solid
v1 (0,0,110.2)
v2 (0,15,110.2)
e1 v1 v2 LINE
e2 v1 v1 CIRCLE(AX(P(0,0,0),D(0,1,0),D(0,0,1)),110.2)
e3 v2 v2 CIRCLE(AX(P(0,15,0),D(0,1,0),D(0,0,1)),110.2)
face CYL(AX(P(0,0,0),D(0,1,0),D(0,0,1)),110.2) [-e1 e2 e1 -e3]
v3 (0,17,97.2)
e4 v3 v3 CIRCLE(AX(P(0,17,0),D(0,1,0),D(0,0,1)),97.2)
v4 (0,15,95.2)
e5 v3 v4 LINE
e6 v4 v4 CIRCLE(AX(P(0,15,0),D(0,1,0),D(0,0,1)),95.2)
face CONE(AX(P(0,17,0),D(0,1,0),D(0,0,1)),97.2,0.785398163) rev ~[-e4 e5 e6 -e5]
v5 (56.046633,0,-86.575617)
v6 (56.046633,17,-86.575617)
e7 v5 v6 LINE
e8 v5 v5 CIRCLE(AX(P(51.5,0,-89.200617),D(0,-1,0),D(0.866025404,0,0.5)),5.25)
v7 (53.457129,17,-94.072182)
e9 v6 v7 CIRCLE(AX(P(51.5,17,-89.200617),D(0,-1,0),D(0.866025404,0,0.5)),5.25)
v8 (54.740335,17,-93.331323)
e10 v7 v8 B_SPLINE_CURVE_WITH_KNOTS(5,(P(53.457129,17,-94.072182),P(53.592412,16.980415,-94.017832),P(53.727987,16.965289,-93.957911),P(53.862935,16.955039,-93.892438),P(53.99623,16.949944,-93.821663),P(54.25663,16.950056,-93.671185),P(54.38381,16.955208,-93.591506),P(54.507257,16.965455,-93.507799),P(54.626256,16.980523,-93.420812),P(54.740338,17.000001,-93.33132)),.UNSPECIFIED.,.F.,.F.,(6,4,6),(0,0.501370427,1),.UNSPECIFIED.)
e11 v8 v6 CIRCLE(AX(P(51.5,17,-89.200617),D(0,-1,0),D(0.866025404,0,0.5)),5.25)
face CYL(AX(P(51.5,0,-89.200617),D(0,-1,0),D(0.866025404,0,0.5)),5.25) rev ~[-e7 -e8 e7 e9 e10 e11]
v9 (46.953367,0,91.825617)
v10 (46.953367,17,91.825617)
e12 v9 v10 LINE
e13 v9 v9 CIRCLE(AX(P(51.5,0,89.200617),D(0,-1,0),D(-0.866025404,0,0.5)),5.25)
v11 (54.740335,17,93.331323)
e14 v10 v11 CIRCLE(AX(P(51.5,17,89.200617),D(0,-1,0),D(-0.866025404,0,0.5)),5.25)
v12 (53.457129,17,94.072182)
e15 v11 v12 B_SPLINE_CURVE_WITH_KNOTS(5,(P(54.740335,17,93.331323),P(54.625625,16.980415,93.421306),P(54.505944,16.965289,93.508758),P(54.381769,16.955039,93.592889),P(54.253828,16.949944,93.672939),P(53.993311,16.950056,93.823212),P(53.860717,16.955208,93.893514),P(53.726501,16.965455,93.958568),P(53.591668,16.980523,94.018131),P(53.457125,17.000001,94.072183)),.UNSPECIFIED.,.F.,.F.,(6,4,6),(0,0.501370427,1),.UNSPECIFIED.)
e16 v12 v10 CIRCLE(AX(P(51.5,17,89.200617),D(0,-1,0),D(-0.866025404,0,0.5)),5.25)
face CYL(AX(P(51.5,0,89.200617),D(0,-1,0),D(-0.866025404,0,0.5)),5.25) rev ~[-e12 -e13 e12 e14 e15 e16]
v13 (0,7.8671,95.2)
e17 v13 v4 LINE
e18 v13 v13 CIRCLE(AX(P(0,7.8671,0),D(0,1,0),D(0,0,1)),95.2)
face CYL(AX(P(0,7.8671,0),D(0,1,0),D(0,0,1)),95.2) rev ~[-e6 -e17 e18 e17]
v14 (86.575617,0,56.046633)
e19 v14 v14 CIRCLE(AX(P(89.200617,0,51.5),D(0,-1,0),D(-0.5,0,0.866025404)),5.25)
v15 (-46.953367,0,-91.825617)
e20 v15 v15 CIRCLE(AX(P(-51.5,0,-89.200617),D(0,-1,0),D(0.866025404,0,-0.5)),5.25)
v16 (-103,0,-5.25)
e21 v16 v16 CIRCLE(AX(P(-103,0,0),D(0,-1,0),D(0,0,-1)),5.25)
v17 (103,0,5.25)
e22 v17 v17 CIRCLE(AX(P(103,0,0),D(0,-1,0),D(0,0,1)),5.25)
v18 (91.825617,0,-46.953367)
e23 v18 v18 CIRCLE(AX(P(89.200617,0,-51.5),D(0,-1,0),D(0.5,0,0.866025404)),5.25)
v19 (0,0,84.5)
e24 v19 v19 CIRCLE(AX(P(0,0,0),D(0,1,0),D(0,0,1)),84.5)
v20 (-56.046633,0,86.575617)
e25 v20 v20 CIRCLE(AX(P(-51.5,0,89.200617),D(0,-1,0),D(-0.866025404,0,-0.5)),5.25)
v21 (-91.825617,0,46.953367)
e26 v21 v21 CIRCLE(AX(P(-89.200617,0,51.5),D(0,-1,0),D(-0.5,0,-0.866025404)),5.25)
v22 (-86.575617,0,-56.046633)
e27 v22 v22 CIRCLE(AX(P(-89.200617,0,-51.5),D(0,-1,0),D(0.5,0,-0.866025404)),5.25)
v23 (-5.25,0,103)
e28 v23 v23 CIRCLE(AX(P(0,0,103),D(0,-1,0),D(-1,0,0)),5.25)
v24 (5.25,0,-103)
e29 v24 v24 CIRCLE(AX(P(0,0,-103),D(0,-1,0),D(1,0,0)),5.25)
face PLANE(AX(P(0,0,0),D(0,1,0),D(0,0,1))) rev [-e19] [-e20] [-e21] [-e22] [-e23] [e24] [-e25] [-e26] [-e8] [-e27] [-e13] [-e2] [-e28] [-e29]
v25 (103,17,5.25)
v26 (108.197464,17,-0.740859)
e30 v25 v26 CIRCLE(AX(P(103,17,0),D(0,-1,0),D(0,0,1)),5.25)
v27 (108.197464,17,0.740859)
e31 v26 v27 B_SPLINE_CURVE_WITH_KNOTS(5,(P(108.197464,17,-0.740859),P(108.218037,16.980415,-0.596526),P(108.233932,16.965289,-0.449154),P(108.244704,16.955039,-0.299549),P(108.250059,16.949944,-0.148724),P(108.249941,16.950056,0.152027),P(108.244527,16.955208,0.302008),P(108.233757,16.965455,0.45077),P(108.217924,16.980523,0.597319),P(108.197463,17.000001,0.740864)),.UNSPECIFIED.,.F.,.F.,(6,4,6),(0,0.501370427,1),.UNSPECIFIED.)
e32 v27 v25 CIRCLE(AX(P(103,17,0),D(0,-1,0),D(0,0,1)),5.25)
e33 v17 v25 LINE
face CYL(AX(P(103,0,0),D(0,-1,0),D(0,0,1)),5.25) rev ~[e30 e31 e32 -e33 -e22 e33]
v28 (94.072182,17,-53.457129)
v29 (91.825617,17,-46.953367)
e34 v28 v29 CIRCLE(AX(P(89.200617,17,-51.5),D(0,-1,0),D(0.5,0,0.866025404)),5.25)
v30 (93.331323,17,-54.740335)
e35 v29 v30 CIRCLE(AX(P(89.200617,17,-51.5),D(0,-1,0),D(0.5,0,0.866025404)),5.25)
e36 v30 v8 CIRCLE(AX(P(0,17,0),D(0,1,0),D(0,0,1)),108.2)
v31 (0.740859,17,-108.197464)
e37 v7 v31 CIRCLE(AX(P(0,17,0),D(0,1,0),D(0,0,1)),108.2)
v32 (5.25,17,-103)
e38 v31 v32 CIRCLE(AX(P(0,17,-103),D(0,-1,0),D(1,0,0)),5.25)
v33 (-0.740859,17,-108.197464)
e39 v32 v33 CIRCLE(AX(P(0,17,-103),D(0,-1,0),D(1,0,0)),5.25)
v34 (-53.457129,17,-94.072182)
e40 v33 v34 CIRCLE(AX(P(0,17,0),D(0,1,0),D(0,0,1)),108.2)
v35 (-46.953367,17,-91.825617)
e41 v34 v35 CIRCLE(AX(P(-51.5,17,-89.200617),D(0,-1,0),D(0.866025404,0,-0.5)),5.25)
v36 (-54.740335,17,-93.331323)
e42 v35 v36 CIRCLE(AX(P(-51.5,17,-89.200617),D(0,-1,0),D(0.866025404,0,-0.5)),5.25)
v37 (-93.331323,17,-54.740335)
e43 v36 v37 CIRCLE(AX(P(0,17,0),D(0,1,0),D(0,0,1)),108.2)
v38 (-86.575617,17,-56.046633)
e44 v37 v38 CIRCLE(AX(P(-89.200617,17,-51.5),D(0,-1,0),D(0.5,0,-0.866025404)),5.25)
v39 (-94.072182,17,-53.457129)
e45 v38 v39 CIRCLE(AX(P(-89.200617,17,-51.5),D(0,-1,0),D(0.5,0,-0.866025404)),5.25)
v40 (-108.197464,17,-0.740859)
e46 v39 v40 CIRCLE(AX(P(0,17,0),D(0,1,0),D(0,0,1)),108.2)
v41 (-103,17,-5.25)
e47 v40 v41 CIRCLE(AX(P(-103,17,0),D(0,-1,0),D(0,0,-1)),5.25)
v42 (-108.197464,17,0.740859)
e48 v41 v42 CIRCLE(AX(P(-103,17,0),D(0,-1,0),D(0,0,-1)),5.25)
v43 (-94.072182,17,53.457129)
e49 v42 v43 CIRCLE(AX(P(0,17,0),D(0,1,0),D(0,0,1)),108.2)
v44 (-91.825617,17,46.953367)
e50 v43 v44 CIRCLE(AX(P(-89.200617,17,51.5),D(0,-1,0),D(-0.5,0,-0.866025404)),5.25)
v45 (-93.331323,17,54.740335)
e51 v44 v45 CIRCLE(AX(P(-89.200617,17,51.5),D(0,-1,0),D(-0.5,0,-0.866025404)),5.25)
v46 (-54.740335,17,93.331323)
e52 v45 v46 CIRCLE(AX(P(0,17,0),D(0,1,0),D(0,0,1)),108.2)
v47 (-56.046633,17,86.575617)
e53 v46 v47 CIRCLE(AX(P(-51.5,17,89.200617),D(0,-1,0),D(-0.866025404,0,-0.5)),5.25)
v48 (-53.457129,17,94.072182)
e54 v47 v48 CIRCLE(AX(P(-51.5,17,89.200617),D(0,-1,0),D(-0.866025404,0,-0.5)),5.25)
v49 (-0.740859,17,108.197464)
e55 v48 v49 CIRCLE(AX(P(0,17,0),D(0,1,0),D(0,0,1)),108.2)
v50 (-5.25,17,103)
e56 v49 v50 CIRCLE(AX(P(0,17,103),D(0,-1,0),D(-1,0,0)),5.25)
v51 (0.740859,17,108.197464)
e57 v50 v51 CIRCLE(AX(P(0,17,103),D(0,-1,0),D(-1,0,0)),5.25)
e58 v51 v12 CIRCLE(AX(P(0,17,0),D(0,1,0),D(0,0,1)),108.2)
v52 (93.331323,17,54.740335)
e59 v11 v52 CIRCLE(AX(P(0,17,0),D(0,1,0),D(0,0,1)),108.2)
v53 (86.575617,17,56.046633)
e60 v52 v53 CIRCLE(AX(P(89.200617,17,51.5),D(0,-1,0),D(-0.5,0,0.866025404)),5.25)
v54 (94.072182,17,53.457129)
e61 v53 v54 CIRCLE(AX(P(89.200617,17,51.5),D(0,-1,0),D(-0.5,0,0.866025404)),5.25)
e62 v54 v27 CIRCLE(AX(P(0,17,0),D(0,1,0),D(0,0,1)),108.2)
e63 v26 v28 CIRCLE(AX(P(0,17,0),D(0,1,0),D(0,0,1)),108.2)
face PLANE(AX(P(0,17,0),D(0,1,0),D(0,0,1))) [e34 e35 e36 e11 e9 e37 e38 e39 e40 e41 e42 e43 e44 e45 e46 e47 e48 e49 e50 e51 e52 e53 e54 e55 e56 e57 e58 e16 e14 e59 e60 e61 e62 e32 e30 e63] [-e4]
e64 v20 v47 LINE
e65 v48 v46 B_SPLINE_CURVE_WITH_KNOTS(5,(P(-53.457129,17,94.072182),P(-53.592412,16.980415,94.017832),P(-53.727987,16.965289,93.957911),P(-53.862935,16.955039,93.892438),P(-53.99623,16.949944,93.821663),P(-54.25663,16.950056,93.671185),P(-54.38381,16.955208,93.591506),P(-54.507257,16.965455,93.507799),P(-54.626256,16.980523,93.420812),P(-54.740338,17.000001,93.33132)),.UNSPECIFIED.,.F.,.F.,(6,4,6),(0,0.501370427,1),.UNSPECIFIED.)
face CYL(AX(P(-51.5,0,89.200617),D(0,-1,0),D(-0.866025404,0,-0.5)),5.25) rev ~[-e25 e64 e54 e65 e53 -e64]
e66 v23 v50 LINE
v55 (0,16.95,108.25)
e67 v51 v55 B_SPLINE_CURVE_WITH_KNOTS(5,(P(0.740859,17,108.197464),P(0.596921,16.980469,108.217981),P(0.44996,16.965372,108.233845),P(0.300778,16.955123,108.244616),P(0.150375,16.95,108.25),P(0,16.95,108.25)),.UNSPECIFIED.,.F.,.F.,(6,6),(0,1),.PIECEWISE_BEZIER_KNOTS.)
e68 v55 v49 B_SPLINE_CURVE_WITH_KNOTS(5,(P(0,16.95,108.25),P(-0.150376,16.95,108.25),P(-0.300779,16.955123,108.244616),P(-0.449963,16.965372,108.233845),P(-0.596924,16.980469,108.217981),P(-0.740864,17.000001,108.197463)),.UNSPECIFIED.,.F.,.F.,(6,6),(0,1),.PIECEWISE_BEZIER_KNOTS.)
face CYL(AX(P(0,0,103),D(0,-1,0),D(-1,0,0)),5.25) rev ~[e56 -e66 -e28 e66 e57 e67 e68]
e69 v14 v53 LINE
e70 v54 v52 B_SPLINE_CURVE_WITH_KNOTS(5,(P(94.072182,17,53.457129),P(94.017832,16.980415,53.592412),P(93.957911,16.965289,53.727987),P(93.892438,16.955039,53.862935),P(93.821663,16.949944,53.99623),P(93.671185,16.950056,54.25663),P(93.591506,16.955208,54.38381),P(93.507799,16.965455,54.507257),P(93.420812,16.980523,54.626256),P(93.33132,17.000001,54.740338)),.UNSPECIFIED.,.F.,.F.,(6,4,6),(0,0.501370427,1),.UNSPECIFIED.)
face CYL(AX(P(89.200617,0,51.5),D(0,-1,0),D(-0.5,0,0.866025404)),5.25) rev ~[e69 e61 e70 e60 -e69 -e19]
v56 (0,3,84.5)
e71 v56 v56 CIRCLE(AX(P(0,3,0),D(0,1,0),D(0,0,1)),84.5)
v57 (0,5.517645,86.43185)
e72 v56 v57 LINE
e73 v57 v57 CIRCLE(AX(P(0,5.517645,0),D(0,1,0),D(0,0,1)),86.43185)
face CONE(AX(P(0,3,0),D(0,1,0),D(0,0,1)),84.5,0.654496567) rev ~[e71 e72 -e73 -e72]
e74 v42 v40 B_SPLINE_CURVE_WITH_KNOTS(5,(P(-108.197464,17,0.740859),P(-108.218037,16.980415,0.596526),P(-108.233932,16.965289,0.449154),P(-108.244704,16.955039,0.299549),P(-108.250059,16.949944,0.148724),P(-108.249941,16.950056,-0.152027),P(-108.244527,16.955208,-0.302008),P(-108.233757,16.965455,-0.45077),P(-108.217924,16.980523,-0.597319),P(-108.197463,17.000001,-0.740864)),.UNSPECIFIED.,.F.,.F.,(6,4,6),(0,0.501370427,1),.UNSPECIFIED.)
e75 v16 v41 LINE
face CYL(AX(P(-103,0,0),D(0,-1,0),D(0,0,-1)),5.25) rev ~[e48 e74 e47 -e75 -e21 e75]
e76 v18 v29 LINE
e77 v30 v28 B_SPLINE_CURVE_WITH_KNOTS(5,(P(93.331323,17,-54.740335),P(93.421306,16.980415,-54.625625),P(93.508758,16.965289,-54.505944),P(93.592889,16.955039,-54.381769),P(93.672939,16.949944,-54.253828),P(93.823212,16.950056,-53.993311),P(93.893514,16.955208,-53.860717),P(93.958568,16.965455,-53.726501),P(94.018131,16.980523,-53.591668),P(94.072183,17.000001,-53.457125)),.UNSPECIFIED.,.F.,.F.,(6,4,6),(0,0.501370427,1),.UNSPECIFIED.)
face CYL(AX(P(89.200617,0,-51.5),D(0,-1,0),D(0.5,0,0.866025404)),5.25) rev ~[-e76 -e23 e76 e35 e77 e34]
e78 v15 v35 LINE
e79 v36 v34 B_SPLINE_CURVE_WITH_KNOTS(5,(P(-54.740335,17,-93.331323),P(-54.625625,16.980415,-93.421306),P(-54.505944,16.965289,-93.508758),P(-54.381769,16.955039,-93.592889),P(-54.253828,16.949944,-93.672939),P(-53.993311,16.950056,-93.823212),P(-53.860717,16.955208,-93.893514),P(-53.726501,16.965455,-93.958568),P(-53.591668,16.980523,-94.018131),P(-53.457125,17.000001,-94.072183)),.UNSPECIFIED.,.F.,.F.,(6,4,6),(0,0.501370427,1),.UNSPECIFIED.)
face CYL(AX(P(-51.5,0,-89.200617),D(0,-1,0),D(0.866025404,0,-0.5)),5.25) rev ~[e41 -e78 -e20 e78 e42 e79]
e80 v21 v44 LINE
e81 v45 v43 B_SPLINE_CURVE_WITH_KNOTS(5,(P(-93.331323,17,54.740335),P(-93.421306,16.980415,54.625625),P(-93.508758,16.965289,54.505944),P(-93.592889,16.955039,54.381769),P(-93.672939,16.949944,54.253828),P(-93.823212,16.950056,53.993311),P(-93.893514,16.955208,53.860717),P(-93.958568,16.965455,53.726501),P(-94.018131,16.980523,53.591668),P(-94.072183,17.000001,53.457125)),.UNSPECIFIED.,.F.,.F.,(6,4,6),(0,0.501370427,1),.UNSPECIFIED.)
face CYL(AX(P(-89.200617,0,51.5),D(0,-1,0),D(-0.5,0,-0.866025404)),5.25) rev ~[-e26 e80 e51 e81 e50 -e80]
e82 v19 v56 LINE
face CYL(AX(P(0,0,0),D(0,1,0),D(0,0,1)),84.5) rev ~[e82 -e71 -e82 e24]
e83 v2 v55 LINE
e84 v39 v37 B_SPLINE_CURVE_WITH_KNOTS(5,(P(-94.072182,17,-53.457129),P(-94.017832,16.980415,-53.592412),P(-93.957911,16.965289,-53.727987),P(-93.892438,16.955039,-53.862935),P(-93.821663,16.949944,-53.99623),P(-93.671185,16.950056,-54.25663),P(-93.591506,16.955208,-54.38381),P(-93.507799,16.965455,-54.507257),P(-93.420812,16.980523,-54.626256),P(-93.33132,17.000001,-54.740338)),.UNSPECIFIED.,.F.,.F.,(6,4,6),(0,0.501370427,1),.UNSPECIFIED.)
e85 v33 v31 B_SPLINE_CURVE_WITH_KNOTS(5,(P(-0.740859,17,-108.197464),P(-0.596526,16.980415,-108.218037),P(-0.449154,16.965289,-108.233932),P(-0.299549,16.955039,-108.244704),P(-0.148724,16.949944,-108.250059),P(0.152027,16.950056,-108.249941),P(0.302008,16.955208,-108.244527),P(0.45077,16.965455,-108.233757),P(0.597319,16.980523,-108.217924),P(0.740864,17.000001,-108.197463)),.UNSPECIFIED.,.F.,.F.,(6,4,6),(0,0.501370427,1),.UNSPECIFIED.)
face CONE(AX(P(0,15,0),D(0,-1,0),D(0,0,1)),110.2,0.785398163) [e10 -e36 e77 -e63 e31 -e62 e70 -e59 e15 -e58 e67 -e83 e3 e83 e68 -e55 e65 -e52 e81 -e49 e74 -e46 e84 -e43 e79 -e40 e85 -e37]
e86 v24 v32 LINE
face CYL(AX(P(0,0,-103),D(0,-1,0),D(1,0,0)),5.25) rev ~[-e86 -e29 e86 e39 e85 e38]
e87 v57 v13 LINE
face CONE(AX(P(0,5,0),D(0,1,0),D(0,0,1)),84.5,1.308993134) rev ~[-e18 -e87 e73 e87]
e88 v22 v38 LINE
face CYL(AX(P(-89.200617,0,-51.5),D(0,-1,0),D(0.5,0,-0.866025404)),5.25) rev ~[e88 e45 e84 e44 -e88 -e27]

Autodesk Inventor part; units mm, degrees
ref_plane "YZ Plane" through (0, 0, 0) normal (1, 0, 0) x (0, 1, 0)
ref_plane "XZ Plane" through (0, 0, 0) normal (0, 1, 0) x (-1, 0, 0)
ref_plane "XY Plane" through (0, 0, 0) normal (0, 0, 1) x (1, 0, 0)
sketch "Sketch1" plane through (0, 0, 0) normal (1, 0, 0) x (0, 1, 0)
  line L0 (0, 84.5) -> (5, 84.5)
  line L1 (5, 84.5) -> (7.8671, 95.2)
  line L2 (7.8671, 95.2) -> (17, 95.2)
  line L3 (5, 84.5) -> (5, 129.2846) construction
  line L4 (0, 84.5) -> (0, 110.2)
  line L5 (0, 110.2) -> (17, 110.2)
  line L6 (17, 110.2) -> (17, 95.2)
  line L7 (-3.4, 0) -> (20.4, 0) projected
  point P0 (0, 0)
  dimension "d0" = 15
  dimension "d1" = 95.2
  dimension "d3" = 84.5
  dimension "d4" = 5
  dimension "d5" = 12
  dimension "d7" = 15
revolve "Revolution1" add sketch "Sketch1" angle 360 about axis through (0, -10, 0) along (0, 1, 0)
sketch "Sketch2" plane through (0, 0, 0) normal (0, -1, 0) x (1, 0, 0)
  circle A0 centre (0, 0) radius 95.2 construction
  circle A1 centre (0, 0) radius 110.2 construction
  circle A2 centre (0, -103) radius 5.25
  dimension "d9" = 10.5
  dimension "d10" = 103
extrude "Extrusion1" cut sketch "Sketch2" against normal through all
pattern_circular "Circular Pattern1" count 12 over 360 about axis through (0, -10, 0) along (0, 1, 0) of "Extrusion1"
chamfer "Chamfer1" distance 2 angle 45 3 edges at (0, 5, -84.5) (0, 17, -95.2) (0, 17, -110.2)
properties part number "KF160_adaptor"
